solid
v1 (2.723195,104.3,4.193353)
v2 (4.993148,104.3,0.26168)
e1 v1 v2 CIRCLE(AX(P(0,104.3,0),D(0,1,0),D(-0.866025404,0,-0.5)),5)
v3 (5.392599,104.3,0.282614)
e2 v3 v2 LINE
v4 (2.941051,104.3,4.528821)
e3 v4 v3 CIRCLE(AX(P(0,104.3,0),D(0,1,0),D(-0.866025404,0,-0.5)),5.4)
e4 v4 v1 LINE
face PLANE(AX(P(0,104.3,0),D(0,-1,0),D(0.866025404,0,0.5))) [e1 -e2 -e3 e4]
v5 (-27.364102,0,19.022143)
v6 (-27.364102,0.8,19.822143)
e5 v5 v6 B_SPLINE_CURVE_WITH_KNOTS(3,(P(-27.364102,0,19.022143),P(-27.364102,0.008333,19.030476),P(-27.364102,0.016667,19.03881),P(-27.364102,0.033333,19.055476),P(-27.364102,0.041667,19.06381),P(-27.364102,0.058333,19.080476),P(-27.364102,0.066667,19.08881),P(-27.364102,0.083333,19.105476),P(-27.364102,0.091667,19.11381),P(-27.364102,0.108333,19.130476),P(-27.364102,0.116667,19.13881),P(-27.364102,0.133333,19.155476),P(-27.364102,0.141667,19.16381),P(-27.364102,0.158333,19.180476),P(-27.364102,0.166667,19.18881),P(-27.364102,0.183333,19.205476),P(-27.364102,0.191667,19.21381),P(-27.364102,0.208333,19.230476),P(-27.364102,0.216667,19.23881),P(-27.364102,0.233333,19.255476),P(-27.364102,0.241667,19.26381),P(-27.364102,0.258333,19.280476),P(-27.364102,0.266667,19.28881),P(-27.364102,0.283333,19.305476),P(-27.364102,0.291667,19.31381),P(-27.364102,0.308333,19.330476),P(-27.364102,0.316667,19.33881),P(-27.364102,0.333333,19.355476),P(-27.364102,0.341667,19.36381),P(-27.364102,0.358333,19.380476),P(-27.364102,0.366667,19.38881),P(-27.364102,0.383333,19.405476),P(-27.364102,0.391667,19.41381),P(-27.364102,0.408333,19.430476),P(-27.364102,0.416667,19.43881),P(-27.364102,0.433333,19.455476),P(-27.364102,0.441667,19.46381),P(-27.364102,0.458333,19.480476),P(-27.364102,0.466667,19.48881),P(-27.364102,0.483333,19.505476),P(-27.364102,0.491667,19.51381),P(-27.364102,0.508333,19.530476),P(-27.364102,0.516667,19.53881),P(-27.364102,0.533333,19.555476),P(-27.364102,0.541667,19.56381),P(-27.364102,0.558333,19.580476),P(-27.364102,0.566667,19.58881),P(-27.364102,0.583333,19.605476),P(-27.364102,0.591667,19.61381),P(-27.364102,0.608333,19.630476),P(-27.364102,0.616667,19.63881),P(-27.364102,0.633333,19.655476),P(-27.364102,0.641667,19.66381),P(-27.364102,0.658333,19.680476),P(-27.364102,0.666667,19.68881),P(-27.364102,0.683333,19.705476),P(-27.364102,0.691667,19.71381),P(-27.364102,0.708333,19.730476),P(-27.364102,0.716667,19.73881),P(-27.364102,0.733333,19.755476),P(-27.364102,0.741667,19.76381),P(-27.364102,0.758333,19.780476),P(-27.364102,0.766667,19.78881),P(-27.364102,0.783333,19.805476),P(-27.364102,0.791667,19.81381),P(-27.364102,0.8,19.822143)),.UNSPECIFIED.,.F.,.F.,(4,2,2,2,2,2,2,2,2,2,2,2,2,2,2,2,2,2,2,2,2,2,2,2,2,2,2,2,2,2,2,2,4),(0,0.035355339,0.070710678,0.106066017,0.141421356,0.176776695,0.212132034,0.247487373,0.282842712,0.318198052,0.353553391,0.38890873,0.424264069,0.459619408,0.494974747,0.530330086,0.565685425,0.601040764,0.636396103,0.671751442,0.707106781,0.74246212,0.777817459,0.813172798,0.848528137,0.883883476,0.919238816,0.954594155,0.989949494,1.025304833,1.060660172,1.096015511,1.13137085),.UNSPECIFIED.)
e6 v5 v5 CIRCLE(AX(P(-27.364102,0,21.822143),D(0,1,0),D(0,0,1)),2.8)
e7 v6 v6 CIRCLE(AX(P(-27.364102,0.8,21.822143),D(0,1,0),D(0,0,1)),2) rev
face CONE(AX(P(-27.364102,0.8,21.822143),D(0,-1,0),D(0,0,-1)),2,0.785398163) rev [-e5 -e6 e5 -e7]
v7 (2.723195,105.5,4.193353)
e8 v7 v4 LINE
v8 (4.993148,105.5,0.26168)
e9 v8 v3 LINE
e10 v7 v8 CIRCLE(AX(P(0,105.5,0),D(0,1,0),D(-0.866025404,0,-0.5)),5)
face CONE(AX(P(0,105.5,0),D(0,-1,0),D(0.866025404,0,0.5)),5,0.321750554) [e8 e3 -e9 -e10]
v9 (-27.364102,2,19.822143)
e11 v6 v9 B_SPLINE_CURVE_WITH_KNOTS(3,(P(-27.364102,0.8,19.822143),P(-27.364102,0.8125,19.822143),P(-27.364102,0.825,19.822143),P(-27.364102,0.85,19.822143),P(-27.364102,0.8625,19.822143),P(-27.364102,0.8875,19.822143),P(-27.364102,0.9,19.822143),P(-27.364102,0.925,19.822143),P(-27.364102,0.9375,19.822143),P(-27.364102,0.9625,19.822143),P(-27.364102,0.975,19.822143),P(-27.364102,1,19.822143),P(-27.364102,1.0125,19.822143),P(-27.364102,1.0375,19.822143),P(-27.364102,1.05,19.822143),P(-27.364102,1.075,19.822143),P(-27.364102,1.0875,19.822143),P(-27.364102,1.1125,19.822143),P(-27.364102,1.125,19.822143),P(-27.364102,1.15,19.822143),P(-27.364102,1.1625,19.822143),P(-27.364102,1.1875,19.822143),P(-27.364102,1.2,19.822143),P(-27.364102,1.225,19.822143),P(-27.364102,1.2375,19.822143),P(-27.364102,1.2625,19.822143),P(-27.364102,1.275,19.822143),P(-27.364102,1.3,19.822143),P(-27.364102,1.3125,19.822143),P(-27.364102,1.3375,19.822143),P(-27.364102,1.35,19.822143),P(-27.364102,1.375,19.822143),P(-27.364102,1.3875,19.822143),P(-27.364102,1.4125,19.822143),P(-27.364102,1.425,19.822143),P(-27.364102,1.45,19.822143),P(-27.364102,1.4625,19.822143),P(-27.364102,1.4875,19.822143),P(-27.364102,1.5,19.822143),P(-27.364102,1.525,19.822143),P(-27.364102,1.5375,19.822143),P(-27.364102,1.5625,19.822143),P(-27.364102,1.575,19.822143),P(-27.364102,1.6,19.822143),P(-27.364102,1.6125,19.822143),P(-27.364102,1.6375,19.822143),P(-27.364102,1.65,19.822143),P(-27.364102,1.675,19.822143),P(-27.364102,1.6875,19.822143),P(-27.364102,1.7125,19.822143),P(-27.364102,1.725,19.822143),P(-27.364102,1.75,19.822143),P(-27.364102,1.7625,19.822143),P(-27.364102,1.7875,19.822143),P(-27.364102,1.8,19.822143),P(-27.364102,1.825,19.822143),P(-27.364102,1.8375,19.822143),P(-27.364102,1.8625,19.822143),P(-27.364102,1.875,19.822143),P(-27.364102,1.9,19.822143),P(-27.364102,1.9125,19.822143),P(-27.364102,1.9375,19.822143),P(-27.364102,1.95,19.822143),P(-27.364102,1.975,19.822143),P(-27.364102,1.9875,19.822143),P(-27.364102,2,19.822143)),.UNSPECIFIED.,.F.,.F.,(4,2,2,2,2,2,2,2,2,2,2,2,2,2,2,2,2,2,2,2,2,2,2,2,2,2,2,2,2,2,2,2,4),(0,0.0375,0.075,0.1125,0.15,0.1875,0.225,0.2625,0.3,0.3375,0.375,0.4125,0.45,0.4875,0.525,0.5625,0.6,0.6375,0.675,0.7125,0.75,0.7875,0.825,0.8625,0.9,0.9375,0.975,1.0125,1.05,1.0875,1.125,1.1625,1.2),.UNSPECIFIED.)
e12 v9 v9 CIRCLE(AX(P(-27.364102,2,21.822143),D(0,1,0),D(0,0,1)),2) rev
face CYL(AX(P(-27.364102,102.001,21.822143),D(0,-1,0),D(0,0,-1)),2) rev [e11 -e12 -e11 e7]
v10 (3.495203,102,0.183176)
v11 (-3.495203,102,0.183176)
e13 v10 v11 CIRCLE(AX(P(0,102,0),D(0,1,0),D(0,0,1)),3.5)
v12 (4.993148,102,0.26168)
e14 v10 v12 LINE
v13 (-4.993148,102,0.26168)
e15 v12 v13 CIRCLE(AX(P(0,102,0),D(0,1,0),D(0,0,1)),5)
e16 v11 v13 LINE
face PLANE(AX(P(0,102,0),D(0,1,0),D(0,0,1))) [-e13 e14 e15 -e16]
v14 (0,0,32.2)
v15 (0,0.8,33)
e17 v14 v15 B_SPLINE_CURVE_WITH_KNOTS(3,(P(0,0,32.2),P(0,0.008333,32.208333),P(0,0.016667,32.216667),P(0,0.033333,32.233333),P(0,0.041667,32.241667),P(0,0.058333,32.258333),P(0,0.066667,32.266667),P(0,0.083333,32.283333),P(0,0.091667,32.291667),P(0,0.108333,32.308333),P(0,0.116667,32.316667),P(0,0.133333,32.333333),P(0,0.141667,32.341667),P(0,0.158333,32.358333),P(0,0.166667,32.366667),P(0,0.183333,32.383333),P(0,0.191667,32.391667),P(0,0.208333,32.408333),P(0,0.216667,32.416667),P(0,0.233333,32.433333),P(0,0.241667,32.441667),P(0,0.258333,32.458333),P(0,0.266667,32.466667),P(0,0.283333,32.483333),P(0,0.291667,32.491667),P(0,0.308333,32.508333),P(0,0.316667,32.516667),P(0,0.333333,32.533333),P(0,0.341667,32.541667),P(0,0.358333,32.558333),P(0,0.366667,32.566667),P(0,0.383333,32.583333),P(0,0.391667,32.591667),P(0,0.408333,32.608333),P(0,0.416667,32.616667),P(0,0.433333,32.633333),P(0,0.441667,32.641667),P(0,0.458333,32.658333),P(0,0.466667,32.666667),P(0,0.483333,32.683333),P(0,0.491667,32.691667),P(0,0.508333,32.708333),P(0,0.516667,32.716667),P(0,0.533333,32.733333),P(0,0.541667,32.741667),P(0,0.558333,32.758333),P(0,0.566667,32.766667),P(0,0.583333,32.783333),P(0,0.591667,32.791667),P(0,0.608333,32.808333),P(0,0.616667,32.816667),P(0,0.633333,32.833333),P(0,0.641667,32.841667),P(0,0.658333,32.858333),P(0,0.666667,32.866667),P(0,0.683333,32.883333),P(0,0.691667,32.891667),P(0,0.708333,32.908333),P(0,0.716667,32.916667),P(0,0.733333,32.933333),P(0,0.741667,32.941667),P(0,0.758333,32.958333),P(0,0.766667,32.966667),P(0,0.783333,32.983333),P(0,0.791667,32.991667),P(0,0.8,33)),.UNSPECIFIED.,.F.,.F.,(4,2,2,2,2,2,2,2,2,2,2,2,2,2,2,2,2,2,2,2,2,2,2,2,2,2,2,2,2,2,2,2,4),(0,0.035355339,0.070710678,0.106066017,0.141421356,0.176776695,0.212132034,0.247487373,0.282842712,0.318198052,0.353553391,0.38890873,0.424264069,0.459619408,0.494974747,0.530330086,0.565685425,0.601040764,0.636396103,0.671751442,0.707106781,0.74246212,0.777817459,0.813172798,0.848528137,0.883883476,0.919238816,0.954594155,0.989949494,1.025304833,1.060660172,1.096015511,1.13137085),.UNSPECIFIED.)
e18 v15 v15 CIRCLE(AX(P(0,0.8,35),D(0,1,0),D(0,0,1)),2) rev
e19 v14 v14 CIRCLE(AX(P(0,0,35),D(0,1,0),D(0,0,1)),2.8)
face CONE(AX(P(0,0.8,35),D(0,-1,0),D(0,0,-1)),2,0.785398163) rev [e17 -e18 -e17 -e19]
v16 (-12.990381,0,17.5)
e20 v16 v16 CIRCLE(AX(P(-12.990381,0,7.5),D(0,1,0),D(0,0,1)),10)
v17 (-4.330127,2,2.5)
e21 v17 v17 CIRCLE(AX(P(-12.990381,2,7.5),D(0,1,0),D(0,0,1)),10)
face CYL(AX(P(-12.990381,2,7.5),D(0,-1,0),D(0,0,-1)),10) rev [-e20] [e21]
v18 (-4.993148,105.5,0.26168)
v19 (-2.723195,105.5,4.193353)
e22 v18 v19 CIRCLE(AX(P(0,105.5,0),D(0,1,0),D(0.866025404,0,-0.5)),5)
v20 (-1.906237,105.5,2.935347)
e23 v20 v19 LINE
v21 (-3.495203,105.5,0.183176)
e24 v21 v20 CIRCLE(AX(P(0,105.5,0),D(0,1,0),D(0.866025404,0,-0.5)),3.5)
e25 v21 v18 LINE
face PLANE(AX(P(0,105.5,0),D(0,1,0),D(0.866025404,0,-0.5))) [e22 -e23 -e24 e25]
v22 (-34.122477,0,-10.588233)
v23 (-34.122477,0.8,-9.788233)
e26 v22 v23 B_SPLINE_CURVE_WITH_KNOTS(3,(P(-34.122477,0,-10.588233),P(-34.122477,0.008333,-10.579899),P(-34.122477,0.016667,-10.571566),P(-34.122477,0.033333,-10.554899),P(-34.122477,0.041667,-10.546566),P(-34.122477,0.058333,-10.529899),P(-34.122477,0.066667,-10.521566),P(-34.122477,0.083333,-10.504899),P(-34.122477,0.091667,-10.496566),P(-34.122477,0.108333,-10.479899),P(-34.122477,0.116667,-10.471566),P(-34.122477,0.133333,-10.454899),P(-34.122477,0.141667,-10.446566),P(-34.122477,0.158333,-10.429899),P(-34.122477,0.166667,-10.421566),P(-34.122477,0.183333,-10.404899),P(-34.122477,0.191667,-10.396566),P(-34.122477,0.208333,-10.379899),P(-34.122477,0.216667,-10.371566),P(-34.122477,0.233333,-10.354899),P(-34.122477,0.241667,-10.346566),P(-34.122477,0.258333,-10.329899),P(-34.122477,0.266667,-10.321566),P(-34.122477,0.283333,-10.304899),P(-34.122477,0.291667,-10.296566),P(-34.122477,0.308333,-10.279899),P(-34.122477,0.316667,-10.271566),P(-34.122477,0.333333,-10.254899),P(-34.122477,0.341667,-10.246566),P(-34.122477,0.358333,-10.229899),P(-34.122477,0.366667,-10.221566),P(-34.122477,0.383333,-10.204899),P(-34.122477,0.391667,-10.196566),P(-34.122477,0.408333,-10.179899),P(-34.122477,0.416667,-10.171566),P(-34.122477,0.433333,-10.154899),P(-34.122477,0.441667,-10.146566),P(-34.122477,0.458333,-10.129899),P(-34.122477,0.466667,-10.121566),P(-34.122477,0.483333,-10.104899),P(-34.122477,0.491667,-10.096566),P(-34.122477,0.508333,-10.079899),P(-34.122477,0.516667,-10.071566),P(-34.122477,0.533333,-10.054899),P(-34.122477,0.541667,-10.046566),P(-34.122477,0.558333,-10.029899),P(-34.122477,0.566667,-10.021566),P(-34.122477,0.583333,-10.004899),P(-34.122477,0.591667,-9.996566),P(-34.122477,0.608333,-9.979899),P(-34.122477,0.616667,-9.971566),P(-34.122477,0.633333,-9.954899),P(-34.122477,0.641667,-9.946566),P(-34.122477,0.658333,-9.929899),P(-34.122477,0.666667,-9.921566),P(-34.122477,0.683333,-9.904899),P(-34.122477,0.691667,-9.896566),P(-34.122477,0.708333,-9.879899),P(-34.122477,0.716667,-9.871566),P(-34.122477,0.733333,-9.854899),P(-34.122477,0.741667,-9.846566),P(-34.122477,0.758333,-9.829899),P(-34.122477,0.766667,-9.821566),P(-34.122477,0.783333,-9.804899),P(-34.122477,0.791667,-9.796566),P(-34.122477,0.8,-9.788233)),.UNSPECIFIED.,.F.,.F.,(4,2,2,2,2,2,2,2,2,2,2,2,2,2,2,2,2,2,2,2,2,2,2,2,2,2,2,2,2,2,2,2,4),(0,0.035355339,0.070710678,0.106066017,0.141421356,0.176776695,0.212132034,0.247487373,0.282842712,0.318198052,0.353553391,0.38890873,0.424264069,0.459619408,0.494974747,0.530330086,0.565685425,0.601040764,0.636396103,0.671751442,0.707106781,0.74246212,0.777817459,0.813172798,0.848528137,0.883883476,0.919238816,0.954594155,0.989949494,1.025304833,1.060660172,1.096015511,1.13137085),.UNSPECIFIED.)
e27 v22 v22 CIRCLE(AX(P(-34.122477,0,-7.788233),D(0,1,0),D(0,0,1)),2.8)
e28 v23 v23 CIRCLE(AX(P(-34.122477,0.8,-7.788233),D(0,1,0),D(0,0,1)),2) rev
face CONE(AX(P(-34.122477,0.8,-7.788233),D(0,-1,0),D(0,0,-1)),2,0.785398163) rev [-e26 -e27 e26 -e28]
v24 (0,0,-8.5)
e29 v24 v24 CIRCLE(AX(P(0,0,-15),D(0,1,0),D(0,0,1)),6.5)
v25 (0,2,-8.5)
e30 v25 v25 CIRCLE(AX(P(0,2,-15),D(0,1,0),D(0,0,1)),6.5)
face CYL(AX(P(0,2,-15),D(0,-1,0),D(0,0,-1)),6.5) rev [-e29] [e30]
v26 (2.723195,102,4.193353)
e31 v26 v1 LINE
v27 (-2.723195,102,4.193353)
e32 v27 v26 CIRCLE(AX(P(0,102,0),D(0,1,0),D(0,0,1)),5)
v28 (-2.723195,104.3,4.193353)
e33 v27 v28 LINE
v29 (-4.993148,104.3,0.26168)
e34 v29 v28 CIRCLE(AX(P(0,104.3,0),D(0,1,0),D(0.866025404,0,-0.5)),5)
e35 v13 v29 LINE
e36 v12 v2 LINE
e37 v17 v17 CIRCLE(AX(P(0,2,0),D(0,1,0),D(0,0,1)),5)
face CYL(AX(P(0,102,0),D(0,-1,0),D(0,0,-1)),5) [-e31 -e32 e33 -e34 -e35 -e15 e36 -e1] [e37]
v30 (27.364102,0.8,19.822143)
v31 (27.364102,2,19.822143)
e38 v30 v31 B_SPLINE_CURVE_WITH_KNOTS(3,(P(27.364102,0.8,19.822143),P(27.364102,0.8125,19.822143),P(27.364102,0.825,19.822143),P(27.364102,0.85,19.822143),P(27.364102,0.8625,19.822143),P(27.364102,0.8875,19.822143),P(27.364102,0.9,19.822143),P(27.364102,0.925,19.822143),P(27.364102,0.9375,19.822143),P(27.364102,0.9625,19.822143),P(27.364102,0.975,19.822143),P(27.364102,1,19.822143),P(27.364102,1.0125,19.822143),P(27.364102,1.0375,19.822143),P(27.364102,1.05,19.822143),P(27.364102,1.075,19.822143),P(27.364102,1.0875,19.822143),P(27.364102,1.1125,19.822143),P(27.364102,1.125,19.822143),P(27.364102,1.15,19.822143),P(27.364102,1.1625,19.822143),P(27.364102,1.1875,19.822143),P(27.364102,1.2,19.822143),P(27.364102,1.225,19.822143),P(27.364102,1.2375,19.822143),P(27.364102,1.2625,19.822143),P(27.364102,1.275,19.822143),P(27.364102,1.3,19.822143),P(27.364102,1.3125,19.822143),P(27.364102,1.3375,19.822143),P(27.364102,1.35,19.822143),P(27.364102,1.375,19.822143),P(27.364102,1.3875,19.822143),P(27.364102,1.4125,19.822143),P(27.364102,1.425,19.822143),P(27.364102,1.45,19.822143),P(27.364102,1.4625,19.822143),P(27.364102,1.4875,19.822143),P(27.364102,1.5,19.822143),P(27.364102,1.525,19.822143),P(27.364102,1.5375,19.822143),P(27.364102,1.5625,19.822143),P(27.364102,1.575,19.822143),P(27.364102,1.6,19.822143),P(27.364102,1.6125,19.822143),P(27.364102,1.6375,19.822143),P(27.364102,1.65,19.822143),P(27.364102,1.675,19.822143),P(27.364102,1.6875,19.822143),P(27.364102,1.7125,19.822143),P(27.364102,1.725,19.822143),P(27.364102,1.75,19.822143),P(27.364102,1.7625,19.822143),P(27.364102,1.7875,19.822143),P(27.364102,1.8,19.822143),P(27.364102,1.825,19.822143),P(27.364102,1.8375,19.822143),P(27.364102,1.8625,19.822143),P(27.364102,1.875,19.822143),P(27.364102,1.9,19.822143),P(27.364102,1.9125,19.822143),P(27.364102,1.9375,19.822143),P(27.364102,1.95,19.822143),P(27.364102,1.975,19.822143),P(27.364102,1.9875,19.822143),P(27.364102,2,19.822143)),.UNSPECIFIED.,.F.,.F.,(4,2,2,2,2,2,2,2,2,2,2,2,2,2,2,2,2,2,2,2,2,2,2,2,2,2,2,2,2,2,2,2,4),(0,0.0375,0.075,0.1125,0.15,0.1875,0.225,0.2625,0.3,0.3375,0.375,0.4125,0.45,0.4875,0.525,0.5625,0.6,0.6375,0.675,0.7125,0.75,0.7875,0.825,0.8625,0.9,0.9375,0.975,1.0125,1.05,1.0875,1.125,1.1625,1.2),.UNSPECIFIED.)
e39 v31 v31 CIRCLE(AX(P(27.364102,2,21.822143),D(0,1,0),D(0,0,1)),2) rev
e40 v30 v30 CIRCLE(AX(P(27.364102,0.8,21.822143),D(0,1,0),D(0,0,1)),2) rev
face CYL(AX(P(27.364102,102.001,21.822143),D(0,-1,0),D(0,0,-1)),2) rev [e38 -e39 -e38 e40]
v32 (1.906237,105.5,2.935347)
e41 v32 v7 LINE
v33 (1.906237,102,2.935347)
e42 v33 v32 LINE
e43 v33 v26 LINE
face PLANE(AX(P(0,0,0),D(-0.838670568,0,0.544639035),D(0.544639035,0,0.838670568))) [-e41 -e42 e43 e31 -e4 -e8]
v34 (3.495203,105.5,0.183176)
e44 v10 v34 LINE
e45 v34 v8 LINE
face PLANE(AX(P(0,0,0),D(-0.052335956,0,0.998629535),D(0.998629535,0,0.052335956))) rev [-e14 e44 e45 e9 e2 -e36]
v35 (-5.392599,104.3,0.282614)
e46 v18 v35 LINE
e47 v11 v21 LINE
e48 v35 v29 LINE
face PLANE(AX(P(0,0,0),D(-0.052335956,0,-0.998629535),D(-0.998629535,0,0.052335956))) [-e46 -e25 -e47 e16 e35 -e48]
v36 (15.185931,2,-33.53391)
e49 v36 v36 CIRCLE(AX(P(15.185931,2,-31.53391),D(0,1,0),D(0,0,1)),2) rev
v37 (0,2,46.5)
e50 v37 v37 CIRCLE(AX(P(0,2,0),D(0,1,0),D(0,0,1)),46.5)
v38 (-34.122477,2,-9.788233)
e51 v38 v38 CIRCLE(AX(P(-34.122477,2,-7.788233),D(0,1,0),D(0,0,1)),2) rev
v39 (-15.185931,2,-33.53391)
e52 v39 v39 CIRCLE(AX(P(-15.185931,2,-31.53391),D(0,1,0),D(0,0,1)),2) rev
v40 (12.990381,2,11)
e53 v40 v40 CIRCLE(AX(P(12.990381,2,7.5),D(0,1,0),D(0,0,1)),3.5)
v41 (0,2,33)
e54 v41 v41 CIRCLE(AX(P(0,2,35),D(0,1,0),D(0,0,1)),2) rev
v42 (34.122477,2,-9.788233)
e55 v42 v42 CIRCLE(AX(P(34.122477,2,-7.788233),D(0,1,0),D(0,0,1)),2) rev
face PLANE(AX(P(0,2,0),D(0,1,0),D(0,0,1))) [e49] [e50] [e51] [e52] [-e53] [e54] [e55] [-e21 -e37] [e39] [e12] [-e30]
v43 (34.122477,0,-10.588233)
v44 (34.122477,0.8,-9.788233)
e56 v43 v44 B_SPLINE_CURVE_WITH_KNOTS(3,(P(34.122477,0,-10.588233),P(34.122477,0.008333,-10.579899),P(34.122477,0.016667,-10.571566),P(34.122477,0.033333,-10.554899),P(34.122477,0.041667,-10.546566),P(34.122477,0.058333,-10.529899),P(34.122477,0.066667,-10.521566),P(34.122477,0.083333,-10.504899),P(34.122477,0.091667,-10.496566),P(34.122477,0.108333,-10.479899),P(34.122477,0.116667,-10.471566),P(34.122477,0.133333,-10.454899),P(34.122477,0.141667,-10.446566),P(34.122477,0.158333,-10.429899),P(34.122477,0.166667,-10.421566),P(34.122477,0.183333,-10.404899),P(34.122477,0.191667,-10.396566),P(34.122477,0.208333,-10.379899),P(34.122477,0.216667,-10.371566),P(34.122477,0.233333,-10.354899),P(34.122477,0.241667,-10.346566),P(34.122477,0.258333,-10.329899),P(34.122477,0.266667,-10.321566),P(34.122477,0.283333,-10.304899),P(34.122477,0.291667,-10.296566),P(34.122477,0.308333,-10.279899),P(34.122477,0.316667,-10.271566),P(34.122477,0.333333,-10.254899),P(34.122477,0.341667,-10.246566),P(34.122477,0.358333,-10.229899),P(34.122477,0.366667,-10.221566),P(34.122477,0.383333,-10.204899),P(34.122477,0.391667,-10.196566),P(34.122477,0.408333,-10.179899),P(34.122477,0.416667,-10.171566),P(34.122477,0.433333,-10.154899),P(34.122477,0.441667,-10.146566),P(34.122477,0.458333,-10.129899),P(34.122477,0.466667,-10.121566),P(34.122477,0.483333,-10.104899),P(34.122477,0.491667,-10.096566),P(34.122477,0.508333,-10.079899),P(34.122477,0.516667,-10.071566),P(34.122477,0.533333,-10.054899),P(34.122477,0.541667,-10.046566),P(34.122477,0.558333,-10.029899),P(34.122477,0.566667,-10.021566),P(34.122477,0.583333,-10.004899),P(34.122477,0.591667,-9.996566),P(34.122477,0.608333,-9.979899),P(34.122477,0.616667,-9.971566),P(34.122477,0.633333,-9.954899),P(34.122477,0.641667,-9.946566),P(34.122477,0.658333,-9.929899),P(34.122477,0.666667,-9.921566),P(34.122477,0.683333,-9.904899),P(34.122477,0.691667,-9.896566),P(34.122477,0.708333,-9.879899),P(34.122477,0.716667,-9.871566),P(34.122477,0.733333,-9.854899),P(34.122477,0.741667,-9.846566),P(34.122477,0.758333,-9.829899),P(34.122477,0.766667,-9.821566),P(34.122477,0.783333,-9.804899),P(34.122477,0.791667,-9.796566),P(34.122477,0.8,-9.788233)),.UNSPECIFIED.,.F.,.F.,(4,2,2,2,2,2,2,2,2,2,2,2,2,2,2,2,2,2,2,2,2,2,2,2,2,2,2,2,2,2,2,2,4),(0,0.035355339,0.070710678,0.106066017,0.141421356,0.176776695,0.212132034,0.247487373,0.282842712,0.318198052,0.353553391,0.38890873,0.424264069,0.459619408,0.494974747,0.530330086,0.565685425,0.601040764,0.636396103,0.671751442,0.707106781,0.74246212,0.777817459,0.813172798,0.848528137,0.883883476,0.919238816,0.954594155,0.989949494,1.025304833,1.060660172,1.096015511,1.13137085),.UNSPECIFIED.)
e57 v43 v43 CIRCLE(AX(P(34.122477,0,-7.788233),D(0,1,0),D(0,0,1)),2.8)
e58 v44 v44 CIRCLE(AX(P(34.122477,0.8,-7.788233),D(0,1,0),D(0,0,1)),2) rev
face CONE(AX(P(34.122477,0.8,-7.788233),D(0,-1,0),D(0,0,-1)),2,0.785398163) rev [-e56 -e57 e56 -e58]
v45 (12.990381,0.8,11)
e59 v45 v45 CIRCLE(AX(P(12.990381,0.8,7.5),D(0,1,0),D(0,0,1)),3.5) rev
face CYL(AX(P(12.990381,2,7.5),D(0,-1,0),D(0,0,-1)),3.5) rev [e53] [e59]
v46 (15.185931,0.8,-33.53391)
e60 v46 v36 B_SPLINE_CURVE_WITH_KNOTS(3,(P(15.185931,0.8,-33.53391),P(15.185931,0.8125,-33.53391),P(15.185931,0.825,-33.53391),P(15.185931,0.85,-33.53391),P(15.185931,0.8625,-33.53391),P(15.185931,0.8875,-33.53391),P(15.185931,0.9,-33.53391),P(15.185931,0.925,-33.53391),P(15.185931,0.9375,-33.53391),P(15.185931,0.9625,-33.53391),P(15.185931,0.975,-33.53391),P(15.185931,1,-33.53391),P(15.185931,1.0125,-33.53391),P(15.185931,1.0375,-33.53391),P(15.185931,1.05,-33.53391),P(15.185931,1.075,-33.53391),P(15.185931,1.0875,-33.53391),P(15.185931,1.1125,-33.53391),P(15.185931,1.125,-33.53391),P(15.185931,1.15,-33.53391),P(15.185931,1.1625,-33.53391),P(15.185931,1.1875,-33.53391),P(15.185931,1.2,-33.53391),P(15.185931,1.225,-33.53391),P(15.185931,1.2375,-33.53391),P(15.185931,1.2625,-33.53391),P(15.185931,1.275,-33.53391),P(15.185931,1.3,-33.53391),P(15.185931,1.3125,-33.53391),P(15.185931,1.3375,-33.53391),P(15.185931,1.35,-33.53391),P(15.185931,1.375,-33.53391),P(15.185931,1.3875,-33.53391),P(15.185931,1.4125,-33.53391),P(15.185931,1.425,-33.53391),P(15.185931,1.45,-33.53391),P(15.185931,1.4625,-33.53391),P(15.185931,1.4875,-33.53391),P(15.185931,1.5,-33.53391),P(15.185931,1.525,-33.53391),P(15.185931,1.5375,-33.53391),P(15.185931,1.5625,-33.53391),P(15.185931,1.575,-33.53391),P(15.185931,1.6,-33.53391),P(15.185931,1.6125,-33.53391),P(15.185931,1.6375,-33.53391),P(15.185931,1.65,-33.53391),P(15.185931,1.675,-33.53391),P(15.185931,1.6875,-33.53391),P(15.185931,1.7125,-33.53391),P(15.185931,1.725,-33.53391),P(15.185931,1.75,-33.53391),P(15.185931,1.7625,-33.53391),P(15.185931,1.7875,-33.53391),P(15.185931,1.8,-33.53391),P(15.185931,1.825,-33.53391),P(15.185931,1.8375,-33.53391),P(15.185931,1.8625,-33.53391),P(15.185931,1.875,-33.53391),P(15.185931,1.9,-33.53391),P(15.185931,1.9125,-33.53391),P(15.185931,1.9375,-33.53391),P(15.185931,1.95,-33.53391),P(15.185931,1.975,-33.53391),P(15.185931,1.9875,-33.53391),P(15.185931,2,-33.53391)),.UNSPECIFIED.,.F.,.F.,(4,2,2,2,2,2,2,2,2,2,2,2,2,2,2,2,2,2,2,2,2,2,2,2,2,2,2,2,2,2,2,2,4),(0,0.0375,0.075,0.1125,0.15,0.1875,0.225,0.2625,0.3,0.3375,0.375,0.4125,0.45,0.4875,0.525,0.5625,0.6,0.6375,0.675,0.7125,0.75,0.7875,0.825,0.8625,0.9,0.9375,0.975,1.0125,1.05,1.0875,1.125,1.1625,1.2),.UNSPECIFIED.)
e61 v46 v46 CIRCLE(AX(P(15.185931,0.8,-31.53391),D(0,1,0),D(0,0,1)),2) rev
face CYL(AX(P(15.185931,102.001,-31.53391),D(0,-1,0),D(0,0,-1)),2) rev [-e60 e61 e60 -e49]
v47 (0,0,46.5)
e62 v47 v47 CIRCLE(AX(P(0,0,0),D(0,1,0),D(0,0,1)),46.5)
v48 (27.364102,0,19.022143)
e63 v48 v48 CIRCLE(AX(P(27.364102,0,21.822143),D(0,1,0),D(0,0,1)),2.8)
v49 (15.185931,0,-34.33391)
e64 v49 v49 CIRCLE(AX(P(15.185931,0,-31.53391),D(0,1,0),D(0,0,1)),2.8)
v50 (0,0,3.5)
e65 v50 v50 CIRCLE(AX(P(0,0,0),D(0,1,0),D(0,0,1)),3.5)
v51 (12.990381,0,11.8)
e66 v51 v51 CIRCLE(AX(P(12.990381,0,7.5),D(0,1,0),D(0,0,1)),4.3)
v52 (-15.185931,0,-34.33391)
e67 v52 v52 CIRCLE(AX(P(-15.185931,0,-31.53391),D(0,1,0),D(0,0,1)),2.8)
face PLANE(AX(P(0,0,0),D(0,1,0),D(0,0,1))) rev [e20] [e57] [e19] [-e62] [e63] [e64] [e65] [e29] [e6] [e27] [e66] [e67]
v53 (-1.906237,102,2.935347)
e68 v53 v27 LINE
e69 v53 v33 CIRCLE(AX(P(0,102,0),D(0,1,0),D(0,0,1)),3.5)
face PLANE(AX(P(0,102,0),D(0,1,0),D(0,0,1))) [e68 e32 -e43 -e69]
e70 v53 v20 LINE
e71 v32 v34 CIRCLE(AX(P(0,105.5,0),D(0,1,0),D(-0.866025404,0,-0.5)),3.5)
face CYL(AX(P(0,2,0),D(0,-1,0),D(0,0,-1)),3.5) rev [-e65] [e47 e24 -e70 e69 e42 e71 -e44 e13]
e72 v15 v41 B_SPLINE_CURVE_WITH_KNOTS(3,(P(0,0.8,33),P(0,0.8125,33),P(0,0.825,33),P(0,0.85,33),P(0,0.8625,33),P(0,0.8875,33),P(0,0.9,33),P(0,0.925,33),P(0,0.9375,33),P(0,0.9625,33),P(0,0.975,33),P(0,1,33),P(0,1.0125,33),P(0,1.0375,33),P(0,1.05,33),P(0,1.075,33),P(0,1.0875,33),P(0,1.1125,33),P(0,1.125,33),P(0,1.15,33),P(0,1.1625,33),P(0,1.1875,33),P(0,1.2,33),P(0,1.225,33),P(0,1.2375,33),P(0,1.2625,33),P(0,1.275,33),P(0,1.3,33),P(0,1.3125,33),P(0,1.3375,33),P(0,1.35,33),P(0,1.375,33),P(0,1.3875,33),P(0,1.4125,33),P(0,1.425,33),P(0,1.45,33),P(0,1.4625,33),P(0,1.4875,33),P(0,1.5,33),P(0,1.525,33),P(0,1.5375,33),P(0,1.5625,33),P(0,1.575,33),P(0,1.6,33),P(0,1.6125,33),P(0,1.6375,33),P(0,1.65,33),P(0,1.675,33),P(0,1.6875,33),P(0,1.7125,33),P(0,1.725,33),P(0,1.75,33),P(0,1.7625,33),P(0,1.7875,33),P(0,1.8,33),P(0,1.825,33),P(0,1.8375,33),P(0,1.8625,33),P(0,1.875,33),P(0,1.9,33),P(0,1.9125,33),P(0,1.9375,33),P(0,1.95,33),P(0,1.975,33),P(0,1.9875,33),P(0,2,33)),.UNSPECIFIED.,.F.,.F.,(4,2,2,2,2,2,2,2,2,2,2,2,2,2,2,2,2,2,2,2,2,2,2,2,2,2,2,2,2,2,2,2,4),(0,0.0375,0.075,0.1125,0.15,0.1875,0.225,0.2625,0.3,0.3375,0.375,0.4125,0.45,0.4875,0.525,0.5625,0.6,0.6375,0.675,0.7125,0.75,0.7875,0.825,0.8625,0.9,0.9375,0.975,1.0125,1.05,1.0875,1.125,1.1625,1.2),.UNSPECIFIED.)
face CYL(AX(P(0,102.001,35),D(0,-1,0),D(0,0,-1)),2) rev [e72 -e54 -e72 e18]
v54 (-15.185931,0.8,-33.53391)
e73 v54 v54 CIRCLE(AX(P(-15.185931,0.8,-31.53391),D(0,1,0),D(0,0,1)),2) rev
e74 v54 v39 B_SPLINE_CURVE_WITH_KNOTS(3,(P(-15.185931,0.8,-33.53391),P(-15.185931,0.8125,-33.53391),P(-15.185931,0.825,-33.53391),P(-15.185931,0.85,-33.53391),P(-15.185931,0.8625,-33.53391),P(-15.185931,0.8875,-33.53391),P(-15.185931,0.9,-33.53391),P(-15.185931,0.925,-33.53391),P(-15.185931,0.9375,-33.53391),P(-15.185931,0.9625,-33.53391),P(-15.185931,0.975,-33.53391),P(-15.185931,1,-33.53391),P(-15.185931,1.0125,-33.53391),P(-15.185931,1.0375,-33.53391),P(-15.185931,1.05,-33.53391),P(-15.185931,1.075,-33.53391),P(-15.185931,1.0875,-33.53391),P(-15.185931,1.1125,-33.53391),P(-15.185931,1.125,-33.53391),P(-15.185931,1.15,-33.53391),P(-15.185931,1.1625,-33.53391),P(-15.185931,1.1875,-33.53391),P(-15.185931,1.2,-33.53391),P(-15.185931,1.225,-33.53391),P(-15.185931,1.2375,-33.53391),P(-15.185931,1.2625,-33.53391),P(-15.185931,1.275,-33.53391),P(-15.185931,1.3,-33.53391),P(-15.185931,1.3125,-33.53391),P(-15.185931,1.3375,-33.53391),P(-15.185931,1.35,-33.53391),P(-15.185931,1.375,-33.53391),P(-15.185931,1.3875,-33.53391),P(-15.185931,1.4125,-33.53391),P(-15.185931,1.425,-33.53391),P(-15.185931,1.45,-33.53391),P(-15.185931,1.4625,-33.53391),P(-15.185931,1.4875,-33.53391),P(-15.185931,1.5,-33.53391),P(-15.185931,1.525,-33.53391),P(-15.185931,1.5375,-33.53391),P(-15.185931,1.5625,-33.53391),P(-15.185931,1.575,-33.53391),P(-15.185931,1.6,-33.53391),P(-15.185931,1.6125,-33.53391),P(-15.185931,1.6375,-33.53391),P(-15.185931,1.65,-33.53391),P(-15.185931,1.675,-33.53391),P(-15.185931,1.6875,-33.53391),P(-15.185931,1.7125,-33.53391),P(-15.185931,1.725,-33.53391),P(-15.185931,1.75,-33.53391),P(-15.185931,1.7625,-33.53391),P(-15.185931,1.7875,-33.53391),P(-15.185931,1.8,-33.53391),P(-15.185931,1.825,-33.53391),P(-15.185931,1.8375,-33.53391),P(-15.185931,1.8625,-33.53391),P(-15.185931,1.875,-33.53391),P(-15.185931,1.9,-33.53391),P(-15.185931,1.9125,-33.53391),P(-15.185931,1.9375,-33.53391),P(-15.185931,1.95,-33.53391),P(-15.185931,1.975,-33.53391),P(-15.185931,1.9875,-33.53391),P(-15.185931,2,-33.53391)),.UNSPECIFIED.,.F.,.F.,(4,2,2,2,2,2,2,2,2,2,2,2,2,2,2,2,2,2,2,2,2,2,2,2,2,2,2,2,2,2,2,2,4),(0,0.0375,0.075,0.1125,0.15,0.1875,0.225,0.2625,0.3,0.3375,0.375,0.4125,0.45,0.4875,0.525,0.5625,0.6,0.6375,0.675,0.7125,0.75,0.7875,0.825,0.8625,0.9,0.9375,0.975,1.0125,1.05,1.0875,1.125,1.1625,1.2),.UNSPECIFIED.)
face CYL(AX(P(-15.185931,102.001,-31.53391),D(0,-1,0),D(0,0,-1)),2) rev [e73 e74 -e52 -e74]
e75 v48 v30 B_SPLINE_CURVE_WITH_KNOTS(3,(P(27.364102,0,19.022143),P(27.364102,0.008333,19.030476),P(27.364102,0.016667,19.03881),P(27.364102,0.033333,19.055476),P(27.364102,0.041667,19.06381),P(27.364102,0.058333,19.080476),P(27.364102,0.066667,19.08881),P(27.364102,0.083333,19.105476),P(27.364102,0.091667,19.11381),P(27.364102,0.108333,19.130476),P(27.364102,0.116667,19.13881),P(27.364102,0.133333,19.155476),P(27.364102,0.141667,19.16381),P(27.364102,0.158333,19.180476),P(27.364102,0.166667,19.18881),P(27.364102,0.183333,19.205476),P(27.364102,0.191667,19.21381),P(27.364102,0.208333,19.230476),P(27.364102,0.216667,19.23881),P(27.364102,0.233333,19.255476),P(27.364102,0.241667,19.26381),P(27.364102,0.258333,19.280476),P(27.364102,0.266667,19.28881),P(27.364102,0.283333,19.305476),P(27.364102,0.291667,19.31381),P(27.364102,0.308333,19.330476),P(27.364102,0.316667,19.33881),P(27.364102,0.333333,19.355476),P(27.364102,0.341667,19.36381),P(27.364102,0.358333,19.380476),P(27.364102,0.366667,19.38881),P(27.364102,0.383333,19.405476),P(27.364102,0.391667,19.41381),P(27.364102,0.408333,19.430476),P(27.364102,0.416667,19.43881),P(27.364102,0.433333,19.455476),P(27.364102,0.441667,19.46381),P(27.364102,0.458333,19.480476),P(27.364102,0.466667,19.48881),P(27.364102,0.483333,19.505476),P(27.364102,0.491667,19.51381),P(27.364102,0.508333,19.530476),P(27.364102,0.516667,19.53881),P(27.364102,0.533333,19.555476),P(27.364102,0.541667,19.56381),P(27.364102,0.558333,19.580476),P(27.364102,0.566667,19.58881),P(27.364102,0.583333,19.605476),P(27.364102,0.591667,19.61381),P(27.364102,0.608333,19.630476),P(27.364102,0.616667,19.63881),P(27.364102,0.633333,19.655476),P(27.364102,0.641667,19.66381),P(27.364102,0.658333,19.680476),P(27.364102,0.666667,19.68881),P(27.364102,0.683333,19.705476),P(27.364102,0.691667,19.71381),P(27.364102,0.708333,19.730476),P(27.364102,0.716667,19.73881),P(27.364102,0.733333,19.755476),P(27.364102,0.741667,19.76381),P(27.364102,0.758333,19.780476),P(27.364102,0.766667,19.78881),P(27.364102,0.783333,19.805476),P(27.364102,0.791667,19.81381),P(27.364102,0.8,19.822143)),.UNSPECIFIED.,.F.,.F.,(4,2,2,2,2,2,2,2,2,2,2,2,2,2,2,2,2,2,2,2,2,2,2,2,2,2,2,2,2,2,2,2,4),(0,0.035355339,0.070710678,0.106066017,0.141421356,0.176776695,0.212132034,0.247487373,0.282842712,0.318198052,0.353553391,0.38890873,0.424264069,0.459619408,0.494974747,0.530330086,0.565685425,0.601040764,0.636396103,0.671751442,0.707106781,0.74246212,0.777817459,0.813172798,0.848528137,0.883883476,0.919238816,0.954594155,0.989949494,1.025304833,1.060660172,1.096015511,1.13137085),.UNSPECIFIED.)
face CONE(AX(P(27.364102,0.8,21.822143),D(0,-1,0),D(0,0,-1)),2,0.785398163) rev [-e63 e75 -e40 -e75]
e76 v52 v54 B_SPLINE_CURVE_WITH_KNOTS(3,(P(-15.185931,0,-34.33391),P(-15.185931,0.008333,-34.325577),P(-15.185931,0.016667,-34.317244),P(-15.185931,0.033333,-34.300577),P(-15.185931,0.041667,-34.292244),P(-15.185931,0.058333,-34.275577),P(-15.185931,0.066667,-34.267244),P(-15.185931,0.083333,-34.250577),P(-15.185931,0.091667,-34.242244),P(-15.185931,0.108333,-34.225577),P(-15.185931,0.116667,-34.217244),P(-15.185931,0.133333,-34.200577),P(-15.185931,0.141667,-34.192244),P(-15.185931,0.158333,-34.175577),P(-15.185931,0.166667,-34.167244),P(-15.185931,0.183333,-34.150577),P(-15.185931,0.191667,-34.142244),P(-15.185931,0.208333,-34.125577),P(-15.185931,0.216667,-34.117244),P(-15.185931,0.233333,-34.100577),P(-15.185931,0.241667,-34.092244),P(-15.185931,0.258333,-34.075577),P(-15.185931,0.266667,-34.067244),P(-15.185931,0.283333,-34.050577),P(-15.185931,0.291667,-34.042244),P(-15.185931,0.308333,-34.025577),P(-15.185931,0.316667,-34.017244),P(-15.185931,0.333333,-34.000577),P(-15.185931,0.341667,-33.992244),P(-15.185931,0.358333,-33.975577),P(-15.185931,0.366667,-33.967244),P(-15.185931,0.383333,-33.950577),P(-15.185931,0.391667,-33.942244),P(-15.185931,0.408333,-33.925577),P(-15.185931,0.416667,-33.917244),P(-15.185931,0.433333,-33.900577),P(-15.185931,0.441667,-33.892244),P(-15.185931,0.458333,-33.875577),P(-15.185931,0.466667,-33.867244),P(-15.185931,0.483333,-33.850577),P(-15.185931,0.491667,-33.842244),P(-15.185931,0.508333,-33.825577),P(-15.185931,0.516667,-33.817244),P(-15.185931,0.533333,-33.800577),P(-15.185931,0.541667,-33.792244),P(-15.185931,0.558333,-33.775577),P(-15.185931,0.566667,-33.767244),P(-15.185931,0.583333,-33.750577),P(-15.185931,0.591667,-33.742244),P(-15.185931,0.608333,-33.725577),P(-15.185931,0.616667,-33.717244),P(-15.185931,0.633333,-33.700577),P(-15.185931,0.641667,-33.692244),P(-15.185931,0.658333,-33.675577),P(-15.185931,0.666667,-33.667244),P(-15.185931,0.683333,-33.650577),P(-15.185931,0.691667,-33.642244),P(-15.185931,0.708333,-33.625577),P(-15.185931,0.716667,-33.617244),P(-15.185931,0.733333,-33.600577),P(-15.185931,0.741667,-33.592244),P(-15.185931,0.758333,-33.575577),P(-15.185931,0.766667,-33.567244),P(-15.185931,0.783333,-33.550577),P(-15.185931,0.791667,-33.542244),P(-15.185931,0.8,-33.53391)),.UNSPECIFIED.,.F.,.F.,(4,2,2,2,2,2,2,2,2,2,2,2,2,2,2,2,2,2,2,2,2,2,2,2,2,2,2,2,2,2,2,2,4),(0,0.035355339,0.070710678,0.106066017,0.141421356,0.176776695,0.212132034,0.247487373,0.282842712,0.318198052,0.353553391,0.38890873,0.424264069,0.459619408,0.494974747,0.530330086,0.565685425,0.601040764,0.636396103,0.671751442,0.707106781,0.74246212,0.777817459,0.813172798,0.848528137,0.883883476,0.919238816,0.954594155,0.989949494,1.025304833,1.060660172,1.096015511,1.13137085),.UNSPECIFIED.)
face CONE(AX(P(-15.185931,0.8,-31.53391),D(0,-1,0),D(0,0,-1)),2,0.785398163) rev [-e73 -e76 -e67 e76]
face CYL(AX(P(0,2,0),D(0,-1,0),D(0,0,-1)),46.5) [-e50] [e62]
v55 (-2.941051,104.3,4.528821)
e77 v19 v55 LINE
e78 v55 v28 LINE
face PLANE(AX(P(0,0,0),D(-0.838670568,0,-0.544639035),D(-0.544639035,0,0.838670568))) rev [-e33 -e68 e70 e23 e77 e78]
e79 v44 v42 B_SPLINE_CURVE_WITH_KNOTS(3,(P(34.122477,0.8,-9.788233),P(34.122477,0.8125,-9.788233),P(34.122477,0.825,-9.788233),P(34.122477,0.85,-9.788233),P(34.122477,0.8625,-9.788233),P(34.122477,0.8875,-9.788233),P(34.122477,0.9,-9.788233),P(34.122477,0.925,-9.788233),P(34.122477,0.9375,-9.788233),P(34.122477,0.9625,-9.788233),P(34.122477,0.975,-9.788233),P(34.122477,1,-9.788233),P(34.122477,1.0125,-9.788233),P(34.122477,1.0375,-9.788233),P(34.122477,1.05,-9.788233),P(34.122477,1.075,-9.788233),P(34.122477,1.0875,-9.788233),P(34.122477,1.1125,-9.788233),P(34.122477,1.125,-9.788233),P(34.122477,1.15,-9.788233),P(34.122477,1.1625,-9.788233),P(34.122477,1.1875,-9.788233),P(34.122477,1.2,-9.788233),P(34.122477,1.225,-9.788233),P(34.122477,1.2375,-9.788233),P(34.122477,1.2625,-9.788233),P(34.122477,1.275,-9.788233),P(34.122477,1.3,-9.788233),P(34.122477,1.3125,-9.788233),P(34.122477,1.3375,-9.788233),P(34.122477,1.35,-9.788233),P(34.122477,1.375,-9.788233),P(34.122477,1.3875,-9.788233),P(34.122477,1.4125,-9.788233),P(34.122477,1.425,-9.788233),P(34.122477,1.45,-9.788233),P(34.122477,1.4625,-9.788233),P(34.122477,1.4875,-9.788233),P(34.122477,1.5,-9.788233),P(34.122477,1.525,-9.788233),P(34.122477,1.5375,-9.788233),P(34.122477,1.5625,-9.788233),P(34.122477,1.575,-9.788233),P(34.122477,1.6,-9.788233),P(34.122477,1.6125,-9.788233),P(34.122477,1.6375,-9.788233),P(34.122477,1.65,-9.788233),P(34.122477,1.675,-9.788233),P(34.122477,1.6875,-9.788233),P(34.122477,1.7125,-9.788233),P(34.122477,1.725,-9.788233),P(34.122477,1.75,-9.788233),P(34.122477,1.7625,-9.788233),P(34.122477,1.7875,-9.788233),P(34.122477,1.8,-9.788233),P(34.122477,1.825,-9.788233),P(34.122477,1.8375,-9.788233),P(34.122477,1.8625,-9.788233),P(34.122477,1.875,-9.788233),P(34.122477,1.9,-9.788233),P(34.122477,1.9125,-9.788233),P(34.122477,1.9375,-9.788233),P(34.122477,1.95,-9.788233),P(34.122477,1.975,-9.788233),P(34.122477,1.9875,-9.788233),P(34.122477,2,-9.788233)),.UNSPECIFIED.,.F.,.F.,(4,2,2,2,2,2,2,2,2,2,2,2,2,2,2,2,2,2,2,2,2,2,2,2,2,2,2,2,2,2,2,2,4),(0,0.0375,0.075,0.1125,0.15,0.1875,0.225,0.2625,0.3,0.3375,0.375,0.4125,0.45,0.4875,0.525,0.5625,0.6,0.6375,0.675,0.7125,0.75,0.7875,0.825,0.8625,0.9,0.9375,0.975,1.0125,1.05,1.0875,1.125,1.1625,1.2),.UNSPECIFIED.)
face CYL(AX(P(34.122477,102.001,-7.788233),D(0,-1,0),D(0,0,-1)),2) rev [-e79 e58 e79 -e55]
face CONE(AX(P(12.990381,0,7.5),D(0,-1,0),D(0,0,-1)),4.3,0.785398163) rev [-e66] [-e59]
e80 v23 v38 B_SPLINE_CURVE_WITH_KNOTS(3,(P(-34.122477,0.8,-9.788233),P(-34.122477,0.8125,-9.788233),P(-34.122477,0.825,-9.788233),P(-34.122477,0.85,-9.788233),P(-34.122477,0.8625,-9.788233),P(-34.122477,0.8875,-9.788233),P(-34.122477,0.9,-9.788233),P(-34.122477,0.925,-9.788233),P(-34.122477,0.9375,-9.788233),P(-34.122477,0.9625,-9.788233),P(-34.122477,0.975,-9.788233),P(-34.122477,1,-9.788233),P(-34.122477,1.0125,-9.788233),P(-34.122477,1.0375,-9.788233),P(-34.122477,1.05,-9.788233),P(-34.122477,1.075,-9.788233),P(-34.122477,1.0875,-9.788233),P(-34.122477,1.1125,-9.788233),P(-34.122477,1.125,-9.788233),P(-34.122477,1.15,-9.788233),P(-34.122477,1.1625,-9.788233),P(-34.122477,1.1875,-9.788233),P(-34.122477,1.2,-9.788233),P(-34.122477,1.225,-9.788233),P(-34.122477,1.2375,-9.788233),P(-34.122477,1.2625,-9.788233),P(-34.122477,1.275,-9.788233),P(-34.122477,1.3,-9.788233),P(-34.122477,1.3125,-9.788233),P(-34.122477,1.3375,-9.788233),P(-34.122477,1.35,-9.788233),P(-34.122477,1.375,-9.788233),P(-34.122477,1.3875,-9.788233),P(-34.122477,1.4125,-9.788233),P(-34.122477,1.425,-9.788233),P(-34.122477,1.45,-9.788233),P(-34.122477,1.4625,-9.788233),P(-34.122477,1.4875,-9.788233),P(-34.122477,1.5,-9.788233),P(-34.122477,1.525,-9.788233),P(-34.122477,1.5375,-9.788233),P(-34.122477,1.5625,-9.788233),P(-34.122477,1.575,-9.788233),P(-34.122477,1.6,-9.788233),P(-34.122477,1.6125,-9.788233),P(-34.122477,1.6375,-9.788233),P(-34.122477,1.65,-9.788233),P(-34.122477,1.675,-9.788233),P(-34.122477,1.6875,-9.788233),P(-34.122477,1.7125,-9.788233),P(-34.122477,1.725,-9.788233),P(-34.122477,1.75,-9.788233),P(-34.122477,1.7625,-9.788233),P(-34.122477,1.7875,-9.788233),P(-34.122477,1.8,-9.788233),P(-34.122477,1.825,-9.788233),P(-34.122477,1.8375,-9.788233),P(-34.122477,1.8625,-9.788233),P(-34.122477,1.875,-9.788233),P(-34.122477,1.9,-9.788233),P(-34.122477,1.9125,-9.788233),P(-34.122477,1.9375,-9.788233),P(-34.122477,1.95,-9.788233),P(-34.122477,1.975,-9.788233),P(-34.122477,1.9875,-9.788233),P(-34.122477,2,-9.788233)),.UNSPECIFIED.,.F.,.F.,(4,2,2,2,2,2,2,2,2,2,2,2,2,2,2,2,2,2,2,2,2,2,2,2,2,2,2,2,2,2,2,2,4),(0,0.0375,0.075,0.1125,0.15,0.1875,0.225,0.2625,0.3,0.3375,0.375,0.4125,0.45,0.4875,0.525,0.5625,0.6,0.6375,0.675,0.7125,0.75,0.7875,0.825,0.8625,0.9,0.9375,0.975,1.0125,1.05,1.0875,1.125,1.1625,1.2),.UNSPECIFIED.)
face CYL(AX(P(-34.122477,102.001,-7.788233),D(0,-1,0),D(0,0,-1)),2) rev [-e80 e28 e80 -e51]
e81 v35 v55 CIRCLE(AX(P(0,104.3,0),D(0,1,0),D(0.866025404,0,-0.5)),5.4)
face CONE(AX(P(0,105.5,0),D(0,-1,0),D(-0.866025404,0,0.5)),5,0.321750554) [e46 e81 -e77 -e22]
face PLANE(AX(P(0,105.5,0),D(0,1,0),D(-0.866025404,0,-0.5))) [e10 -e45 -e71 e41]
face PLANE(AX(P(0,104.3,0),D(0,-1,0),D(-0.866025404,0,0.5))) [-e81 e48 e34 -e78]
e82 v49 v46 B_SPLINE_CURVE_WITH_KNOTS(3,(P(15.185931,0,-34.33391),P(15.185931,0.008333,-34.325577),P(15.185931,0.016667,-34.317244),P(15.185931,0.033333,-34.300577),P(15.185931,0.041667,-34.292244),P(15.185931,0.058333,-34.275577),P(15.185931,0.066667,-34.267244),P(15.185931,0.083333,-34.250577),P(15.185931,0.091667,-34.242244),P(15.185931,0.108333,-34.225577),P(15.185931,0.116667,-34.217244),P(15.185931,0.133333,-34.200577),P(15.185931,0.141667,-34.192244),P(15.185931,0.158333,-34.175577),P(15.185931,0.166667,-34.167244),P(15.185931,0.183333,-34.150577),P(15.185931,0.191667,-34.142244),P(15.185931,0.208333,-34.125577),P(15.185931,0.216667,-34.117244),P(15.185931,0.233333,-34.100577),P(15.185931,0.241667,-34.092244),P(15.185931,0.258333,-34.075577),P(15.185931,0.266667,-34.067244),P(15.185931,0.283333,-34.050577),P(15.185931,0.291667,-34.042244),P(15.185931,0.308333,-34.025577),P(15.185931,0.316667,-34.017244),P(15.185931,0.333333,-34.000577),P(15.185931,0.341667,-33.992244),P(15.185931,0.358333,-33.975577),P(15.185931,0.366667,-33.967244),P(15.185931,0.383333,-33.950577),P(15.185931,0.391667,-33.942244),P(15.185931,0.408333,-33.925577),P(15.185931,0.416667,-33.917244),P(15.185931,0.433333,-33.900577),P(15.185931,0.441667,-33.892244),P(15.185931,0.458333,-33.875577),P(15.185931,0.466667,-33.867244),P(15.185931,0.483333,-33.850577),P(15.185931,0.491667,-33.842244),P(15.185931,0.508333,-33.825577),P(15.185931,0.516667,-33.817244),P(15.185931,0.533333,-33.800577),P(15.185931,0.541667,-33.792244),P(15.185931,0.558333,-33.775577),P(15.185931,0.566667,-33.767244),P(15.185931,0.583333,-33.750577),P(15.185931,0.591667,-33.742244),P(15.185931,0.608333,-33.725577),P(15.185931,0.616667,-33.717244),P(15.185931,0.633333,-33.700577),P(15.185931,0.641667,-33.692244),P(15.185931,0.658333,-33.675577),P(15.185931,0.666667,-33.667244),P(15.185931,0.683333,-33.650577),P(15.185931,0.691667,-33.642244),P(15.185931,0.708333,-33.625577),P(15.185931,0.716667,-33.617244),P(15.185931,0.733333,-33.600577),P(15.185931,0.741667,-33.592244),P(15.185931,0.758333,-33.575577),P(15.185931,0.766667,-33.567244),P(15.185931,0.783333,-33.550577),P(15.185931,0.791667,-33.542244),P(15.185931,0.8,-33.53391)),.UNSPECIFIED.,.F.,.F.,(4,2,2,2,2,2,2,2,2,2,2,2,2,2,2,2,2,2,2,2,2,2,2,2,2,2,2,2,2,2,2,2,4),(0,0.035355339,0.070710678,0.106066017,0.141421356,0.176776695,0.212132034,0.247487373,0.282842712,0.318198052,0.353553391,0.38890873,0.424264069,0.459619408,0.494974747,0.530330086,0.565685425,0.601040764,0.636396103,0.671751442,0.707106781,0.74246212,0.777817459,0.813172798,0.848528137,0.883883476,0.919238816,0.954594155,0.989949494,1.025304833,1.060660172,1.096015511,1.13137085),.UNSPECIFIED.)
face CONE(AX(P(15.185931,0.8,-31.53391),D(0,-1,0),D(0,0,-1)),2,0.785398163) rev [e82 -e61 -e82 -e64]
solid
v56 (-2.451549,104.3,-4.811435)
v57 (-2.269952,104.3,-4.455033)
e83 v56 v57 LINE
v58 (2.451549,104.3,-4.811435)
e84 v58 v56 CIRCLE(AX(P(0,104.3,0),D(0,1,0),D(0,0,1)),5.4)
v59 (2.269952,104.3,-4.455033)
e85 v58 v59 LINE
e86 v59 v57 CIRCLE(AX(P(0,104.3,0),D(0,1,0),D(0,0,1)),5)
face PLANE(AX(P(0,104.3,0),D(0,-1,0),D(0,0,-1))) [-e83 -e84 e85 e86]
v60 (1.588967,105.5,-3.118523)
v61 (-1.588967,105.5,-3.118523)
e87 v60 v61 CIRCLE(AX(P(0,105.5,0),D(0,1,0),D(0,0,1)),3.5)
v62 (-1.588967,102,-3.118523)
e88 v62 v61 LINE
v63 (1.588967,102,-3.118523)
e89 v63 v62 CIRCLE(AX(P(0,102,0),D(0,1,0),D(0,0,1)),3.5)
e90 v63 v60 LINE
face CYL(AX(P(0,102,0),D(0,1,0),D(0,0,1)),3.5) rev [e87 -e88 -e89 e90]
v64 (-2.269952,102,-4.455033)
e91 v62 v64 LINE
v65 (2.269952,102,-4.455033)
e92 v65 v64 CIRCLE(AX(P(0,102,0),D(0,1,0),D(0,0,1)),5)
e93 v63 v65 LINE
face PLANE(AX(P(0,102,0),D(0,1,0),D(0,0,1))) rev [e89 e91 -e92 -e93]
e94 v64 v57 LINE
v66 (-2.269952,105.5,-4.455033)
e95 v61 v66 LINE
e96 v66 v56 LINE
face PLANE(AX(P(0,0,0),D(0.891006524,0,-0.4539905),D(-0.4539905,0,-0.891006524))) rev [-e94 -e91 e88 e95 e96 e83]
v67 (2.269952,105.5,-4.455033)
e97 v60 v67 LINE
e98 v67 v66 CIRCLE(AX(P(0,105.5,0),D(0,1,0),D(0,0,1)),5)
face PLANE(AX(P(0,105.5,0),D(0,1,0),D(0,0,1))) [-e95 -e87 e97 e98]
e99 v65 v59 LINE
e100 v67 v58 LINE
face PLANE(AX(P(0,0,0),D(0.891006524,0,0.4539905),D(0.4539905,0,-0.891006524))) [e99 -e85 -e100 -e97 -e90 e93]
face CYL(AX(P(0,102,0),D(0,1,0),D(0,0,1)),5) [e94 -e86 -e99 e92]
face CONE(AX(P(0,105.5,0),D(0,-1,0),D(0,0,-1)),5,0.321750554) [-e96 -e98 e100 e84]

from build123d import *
from build123d.topology import SkipClean

# Parameters (mm, degrees)
SKETCH1_R           = 46.5
SKETCH1_R_2         = 6.5
SKETCH1_R_3         = 10
SKETCH1_R_4         = 3.5
BOSS_EXTRUDE1_DEPTH = 2
SKETCH3_R           = 5
SKETCH3_R_2         = 3.5
BOSS_EXTRUDE2_DEPTH = 100
CUT_EXTRUDE2_REACH  = 123.361
SKETCH6_R           = 2
CHAMFER2_SIZE       = 0.8
REVOLVE1_ANGLE      = 54
CIRPATTERN1_COUNT   = 3


# Read off the part's stored shape, not the designer's step: Revolve1
with BuildPart() as part:
    # Sketch1 → Boss-Extrude1 (new body)
    with BuildSketch(Plane(origin=(0, 0, 0), x_dir=(1, 0, 0), z_dir=(0, 1, 0))):
        with Locations(Location((0, 0, 0), (0, 0, 270))):
            Circle(SKETCH1_R)
        with Locations(Location((0, 15, 0), (0, 0, 270))):
            Circle(SKETCH1_R_2, mode=Mode.SUBTRACT)
        with Locations(Location((-12.990381057, -7.5, 0), (0, 0, 270))):
            Circle(SKETCH1_R_3, mode=Mode.SUBTRACT)
        with Locations(Location((12.990381057, -7.5, 0), (0, 0, 270))):
            Circle(SKETCH1_R_4, mode=Mode.SUBTRACT)
        with Locations(Location((0, 0, 0), (0, 0, 270))):
            Circle(SKETCH1_R_4, mode=Mode.SUBTRACT)
    extrude(amount=BOSS_EXTRUDE1_DEPTH)

    # Sketch3 → Boss-Extrude2 (add)
    with BuildSketch(Plane(origin=(0, 2, 0), x_dir=(1, 0, 0), z_dir=(0, 1, 0))):
        with Locations(Location((0, 0, 0), (0, 0, 210))):
            Circle(SKETCH3_R)
        with Locations(Location((0, 0, 0), (0, 0, 270))):
            Circle(SKETCH3_R_2, mode=Mode.SUBTRACT)
    extrude(amount=BOSS_EXTRUDE2_DEPTH)

    # Sketch6 → Cut-Extrude2 (cut, up to next)
    with BuildSketch(Plane.XZ, mode=Mode.PRIVATE) as cut_extrude2_sk1:
        with Locations(Location((0, 35, 0), (0, 0, 270))):
            Circle(SKETCH6_R)
    cut_extrude2_tool1 = extrude(cut_extrude2_sk1.sketch, amount=-CUT_EXTRUDE2_REACH, mode=Mode.PRIVATE) & part.part
    # Sketch6 → Cut-Extrude2 (cut, up to next)
    with BuildSketch(Plane.XZ, mode=Mode.PRIVATE) as cut_extrude2_sk2:
        with Locations(Location((27.364101886, 21.822143065, 0), (0, 0, 270))):
            Circle(SKETCH6_R)
    cut_extrude2_tool2 = extrude(cut_extrude2_sk2.sketch, amount=-CUT_EXTRUDE2_REACH, mode=Mode.PRIVATE) & part.part
    # Sketch6 → Cut-Extrude2 (cut, up to next)
    with BuildSketch(Plane.XZ, mode=Mode.PRIVATE) as cut_extrude2_sk3:
        with Locations(Location((34.122476926, -7.788232688, 0), (0, 0, 270))):
            Circle(SKETCH6_R)
    cut_extrude2_tool3 = extrude(cut_extrude2_sk3.sketch, amount=-CUT_EXTRUDE2_REACH, mode=Mode.PRIVATE) & part.part
    # Sketch6 → Cut-Extrude2 (cut, up to next)
    with BuildSketch(Plane.XZ, mode=Mode.PRIVATE) as cut_extrude2_sk4:
        with Locations(Location((15.185930869, -31.533910377, 0), (0, 0, 270))):
            Circle(SKETCH6_R)
    cut_extrude2_tool4 = extrude(cut_extrude2_sk4.sketch, amount=-CUT_EXTRUDE2_REACH, mode=Mode.PRIVATE) & part.part
    # Sketch6 → Cut-Extrude2 (cut, up to next)
    with BuildSketch(Plane.XZ, mode=Mode.PRIVATE) as cut_extrude2_sk5:
        with Locations(Location((-15.185930869, -31.533910377, 0), (0, 0, 270))):
            Circle(SKETCH6_R)
    cut_extrude2_tool5 = extrude(cut_extrude2_sk5.sketch, amount=-CUT_EXTRUDE2_REACH, mode=Mode.PRIVATE) & part.part
    # Sketch6 → Cut-Extrude2 (cut, up to next)
    with BuildSketch(Plane.XZ, mode=Mode.PRIVATE) as cut_extrude2_sk6:
        with Locations(Location((-34.122476926, -7.788232688, 0), (0, 0, 270))):
            Circle(SKETCH6_R)
    cut_extrude2_tool6 = extrude(cut_extrude2_sk6.sketch, amount=-CUT_EXTRUDE2_REACH, mode=Mode.PRIVATE) & part.part
    # Sketch6 → Cut-Extrude2 (cut, up to next)
    with BuildSketch(Plane.XZ, mode=Mode.PRIVATE) as cut_extrude2_sk7:
        with Locations(Location((-27.364101886, 21.822143065, 0), (0, 0, 270))):
            Circle(SKETCH6_R)
    cut_extrude2_tool7 = extrude(cut_extrude2_sk7.sketch, amount=-CUT_EXTRUDE2_REACH, mode=Mode.PRIVATE) & part.part
    add(cut_extrude2_tool1.solids().sort_by_distance((0, 0, 35))[0], mode=Mode.SUBTRACT)
    add(cut_extrude2_tool2.solids().sort_by_distance((27.364102, 0, 21.822143))[0], mode=Mode.SUBTRACT)
    add(cut_extrude2_tool3.solids().sort_by_distance((34.122477, 0, -7.788233))[0], mode=Mode.SUBTRACT)
    add(cut_extrude2_tool4.solids().sort_by_distance((15.185931, 0, -31.53391))[0], mode=Mode.SUBTRACT)
    add(cut_extrude2_tool5.solids().sort_by_distance((-15.185931, 0, -31.53391))[0], mode=Mode.SUBTRACT)
    add(cut_extrude2_tool6.solids().sort_by_distance((-34.122477, 0, -7.788233))[0], mode=Mode.SUBTRACT)
    add(cut_extrude2_tool7.solids().sort_by_distance((-27.364102, 0, 21.822143))[0], mode=Mode.SUBTRACT)

    # Chamfer2
    chamfer2_edges = [part.edges().sort_by_distance(p)[0] for p in [
        (12.990381057, 0, 4),
        (34.122476926, 0, -5.788232688),
        (27.364101886, 0, 23.822143065),
        (0, 0, 37),
        (-27.364101886, 0, 23.822143065),
        (-34.122476926, 0, -5.788232688),
        (-15.185930869, 0, -29.533910377),
        (15.185930869, 0, -29.533910377),
    ]]
    chamfer(chamfer2_edges, length=CHAMFER2_SIZE)


with BuildPart() as body_2:
    # Revolve1 outline → Revolve1 (revolve)
    with BuildSketch(Plane(origin=(0, 0, 0), x_dir=(0.4539904997395532, 0, -0.8910065241883646), z_dir=(0.8910065241883646, 0, 0.4539904997395532))):
        Polygon((5, 102), (5, 104.3), (5.4, 104.3), (5, 105.5), (3.5, 105.5), (3.5, 102), align=None)
    revolve1 = revolve(axis=Axis((0, 0, 0), (0, 1, 0)), revolution_arc=REVOLVE1_ANGLE)


with BuildPart() as part_1:
    with SkipClean():  # the faces are left unmerged after this step: merging them gives an invalid solid
        add(part.part)

        # CirPattern1: Revolve1 ×3 about axis
        cirpattern1_axis = Axis((0, 102, 0), (0, -1, 0))
        for i in range(1, CIRPATTERN1_COUNT):
            add(revolve1.rotate(cirpattern1_axis, i * 360 / CIRPATTERN1_COUNT))


solid = Compound([body_2.part, part_1.part])
